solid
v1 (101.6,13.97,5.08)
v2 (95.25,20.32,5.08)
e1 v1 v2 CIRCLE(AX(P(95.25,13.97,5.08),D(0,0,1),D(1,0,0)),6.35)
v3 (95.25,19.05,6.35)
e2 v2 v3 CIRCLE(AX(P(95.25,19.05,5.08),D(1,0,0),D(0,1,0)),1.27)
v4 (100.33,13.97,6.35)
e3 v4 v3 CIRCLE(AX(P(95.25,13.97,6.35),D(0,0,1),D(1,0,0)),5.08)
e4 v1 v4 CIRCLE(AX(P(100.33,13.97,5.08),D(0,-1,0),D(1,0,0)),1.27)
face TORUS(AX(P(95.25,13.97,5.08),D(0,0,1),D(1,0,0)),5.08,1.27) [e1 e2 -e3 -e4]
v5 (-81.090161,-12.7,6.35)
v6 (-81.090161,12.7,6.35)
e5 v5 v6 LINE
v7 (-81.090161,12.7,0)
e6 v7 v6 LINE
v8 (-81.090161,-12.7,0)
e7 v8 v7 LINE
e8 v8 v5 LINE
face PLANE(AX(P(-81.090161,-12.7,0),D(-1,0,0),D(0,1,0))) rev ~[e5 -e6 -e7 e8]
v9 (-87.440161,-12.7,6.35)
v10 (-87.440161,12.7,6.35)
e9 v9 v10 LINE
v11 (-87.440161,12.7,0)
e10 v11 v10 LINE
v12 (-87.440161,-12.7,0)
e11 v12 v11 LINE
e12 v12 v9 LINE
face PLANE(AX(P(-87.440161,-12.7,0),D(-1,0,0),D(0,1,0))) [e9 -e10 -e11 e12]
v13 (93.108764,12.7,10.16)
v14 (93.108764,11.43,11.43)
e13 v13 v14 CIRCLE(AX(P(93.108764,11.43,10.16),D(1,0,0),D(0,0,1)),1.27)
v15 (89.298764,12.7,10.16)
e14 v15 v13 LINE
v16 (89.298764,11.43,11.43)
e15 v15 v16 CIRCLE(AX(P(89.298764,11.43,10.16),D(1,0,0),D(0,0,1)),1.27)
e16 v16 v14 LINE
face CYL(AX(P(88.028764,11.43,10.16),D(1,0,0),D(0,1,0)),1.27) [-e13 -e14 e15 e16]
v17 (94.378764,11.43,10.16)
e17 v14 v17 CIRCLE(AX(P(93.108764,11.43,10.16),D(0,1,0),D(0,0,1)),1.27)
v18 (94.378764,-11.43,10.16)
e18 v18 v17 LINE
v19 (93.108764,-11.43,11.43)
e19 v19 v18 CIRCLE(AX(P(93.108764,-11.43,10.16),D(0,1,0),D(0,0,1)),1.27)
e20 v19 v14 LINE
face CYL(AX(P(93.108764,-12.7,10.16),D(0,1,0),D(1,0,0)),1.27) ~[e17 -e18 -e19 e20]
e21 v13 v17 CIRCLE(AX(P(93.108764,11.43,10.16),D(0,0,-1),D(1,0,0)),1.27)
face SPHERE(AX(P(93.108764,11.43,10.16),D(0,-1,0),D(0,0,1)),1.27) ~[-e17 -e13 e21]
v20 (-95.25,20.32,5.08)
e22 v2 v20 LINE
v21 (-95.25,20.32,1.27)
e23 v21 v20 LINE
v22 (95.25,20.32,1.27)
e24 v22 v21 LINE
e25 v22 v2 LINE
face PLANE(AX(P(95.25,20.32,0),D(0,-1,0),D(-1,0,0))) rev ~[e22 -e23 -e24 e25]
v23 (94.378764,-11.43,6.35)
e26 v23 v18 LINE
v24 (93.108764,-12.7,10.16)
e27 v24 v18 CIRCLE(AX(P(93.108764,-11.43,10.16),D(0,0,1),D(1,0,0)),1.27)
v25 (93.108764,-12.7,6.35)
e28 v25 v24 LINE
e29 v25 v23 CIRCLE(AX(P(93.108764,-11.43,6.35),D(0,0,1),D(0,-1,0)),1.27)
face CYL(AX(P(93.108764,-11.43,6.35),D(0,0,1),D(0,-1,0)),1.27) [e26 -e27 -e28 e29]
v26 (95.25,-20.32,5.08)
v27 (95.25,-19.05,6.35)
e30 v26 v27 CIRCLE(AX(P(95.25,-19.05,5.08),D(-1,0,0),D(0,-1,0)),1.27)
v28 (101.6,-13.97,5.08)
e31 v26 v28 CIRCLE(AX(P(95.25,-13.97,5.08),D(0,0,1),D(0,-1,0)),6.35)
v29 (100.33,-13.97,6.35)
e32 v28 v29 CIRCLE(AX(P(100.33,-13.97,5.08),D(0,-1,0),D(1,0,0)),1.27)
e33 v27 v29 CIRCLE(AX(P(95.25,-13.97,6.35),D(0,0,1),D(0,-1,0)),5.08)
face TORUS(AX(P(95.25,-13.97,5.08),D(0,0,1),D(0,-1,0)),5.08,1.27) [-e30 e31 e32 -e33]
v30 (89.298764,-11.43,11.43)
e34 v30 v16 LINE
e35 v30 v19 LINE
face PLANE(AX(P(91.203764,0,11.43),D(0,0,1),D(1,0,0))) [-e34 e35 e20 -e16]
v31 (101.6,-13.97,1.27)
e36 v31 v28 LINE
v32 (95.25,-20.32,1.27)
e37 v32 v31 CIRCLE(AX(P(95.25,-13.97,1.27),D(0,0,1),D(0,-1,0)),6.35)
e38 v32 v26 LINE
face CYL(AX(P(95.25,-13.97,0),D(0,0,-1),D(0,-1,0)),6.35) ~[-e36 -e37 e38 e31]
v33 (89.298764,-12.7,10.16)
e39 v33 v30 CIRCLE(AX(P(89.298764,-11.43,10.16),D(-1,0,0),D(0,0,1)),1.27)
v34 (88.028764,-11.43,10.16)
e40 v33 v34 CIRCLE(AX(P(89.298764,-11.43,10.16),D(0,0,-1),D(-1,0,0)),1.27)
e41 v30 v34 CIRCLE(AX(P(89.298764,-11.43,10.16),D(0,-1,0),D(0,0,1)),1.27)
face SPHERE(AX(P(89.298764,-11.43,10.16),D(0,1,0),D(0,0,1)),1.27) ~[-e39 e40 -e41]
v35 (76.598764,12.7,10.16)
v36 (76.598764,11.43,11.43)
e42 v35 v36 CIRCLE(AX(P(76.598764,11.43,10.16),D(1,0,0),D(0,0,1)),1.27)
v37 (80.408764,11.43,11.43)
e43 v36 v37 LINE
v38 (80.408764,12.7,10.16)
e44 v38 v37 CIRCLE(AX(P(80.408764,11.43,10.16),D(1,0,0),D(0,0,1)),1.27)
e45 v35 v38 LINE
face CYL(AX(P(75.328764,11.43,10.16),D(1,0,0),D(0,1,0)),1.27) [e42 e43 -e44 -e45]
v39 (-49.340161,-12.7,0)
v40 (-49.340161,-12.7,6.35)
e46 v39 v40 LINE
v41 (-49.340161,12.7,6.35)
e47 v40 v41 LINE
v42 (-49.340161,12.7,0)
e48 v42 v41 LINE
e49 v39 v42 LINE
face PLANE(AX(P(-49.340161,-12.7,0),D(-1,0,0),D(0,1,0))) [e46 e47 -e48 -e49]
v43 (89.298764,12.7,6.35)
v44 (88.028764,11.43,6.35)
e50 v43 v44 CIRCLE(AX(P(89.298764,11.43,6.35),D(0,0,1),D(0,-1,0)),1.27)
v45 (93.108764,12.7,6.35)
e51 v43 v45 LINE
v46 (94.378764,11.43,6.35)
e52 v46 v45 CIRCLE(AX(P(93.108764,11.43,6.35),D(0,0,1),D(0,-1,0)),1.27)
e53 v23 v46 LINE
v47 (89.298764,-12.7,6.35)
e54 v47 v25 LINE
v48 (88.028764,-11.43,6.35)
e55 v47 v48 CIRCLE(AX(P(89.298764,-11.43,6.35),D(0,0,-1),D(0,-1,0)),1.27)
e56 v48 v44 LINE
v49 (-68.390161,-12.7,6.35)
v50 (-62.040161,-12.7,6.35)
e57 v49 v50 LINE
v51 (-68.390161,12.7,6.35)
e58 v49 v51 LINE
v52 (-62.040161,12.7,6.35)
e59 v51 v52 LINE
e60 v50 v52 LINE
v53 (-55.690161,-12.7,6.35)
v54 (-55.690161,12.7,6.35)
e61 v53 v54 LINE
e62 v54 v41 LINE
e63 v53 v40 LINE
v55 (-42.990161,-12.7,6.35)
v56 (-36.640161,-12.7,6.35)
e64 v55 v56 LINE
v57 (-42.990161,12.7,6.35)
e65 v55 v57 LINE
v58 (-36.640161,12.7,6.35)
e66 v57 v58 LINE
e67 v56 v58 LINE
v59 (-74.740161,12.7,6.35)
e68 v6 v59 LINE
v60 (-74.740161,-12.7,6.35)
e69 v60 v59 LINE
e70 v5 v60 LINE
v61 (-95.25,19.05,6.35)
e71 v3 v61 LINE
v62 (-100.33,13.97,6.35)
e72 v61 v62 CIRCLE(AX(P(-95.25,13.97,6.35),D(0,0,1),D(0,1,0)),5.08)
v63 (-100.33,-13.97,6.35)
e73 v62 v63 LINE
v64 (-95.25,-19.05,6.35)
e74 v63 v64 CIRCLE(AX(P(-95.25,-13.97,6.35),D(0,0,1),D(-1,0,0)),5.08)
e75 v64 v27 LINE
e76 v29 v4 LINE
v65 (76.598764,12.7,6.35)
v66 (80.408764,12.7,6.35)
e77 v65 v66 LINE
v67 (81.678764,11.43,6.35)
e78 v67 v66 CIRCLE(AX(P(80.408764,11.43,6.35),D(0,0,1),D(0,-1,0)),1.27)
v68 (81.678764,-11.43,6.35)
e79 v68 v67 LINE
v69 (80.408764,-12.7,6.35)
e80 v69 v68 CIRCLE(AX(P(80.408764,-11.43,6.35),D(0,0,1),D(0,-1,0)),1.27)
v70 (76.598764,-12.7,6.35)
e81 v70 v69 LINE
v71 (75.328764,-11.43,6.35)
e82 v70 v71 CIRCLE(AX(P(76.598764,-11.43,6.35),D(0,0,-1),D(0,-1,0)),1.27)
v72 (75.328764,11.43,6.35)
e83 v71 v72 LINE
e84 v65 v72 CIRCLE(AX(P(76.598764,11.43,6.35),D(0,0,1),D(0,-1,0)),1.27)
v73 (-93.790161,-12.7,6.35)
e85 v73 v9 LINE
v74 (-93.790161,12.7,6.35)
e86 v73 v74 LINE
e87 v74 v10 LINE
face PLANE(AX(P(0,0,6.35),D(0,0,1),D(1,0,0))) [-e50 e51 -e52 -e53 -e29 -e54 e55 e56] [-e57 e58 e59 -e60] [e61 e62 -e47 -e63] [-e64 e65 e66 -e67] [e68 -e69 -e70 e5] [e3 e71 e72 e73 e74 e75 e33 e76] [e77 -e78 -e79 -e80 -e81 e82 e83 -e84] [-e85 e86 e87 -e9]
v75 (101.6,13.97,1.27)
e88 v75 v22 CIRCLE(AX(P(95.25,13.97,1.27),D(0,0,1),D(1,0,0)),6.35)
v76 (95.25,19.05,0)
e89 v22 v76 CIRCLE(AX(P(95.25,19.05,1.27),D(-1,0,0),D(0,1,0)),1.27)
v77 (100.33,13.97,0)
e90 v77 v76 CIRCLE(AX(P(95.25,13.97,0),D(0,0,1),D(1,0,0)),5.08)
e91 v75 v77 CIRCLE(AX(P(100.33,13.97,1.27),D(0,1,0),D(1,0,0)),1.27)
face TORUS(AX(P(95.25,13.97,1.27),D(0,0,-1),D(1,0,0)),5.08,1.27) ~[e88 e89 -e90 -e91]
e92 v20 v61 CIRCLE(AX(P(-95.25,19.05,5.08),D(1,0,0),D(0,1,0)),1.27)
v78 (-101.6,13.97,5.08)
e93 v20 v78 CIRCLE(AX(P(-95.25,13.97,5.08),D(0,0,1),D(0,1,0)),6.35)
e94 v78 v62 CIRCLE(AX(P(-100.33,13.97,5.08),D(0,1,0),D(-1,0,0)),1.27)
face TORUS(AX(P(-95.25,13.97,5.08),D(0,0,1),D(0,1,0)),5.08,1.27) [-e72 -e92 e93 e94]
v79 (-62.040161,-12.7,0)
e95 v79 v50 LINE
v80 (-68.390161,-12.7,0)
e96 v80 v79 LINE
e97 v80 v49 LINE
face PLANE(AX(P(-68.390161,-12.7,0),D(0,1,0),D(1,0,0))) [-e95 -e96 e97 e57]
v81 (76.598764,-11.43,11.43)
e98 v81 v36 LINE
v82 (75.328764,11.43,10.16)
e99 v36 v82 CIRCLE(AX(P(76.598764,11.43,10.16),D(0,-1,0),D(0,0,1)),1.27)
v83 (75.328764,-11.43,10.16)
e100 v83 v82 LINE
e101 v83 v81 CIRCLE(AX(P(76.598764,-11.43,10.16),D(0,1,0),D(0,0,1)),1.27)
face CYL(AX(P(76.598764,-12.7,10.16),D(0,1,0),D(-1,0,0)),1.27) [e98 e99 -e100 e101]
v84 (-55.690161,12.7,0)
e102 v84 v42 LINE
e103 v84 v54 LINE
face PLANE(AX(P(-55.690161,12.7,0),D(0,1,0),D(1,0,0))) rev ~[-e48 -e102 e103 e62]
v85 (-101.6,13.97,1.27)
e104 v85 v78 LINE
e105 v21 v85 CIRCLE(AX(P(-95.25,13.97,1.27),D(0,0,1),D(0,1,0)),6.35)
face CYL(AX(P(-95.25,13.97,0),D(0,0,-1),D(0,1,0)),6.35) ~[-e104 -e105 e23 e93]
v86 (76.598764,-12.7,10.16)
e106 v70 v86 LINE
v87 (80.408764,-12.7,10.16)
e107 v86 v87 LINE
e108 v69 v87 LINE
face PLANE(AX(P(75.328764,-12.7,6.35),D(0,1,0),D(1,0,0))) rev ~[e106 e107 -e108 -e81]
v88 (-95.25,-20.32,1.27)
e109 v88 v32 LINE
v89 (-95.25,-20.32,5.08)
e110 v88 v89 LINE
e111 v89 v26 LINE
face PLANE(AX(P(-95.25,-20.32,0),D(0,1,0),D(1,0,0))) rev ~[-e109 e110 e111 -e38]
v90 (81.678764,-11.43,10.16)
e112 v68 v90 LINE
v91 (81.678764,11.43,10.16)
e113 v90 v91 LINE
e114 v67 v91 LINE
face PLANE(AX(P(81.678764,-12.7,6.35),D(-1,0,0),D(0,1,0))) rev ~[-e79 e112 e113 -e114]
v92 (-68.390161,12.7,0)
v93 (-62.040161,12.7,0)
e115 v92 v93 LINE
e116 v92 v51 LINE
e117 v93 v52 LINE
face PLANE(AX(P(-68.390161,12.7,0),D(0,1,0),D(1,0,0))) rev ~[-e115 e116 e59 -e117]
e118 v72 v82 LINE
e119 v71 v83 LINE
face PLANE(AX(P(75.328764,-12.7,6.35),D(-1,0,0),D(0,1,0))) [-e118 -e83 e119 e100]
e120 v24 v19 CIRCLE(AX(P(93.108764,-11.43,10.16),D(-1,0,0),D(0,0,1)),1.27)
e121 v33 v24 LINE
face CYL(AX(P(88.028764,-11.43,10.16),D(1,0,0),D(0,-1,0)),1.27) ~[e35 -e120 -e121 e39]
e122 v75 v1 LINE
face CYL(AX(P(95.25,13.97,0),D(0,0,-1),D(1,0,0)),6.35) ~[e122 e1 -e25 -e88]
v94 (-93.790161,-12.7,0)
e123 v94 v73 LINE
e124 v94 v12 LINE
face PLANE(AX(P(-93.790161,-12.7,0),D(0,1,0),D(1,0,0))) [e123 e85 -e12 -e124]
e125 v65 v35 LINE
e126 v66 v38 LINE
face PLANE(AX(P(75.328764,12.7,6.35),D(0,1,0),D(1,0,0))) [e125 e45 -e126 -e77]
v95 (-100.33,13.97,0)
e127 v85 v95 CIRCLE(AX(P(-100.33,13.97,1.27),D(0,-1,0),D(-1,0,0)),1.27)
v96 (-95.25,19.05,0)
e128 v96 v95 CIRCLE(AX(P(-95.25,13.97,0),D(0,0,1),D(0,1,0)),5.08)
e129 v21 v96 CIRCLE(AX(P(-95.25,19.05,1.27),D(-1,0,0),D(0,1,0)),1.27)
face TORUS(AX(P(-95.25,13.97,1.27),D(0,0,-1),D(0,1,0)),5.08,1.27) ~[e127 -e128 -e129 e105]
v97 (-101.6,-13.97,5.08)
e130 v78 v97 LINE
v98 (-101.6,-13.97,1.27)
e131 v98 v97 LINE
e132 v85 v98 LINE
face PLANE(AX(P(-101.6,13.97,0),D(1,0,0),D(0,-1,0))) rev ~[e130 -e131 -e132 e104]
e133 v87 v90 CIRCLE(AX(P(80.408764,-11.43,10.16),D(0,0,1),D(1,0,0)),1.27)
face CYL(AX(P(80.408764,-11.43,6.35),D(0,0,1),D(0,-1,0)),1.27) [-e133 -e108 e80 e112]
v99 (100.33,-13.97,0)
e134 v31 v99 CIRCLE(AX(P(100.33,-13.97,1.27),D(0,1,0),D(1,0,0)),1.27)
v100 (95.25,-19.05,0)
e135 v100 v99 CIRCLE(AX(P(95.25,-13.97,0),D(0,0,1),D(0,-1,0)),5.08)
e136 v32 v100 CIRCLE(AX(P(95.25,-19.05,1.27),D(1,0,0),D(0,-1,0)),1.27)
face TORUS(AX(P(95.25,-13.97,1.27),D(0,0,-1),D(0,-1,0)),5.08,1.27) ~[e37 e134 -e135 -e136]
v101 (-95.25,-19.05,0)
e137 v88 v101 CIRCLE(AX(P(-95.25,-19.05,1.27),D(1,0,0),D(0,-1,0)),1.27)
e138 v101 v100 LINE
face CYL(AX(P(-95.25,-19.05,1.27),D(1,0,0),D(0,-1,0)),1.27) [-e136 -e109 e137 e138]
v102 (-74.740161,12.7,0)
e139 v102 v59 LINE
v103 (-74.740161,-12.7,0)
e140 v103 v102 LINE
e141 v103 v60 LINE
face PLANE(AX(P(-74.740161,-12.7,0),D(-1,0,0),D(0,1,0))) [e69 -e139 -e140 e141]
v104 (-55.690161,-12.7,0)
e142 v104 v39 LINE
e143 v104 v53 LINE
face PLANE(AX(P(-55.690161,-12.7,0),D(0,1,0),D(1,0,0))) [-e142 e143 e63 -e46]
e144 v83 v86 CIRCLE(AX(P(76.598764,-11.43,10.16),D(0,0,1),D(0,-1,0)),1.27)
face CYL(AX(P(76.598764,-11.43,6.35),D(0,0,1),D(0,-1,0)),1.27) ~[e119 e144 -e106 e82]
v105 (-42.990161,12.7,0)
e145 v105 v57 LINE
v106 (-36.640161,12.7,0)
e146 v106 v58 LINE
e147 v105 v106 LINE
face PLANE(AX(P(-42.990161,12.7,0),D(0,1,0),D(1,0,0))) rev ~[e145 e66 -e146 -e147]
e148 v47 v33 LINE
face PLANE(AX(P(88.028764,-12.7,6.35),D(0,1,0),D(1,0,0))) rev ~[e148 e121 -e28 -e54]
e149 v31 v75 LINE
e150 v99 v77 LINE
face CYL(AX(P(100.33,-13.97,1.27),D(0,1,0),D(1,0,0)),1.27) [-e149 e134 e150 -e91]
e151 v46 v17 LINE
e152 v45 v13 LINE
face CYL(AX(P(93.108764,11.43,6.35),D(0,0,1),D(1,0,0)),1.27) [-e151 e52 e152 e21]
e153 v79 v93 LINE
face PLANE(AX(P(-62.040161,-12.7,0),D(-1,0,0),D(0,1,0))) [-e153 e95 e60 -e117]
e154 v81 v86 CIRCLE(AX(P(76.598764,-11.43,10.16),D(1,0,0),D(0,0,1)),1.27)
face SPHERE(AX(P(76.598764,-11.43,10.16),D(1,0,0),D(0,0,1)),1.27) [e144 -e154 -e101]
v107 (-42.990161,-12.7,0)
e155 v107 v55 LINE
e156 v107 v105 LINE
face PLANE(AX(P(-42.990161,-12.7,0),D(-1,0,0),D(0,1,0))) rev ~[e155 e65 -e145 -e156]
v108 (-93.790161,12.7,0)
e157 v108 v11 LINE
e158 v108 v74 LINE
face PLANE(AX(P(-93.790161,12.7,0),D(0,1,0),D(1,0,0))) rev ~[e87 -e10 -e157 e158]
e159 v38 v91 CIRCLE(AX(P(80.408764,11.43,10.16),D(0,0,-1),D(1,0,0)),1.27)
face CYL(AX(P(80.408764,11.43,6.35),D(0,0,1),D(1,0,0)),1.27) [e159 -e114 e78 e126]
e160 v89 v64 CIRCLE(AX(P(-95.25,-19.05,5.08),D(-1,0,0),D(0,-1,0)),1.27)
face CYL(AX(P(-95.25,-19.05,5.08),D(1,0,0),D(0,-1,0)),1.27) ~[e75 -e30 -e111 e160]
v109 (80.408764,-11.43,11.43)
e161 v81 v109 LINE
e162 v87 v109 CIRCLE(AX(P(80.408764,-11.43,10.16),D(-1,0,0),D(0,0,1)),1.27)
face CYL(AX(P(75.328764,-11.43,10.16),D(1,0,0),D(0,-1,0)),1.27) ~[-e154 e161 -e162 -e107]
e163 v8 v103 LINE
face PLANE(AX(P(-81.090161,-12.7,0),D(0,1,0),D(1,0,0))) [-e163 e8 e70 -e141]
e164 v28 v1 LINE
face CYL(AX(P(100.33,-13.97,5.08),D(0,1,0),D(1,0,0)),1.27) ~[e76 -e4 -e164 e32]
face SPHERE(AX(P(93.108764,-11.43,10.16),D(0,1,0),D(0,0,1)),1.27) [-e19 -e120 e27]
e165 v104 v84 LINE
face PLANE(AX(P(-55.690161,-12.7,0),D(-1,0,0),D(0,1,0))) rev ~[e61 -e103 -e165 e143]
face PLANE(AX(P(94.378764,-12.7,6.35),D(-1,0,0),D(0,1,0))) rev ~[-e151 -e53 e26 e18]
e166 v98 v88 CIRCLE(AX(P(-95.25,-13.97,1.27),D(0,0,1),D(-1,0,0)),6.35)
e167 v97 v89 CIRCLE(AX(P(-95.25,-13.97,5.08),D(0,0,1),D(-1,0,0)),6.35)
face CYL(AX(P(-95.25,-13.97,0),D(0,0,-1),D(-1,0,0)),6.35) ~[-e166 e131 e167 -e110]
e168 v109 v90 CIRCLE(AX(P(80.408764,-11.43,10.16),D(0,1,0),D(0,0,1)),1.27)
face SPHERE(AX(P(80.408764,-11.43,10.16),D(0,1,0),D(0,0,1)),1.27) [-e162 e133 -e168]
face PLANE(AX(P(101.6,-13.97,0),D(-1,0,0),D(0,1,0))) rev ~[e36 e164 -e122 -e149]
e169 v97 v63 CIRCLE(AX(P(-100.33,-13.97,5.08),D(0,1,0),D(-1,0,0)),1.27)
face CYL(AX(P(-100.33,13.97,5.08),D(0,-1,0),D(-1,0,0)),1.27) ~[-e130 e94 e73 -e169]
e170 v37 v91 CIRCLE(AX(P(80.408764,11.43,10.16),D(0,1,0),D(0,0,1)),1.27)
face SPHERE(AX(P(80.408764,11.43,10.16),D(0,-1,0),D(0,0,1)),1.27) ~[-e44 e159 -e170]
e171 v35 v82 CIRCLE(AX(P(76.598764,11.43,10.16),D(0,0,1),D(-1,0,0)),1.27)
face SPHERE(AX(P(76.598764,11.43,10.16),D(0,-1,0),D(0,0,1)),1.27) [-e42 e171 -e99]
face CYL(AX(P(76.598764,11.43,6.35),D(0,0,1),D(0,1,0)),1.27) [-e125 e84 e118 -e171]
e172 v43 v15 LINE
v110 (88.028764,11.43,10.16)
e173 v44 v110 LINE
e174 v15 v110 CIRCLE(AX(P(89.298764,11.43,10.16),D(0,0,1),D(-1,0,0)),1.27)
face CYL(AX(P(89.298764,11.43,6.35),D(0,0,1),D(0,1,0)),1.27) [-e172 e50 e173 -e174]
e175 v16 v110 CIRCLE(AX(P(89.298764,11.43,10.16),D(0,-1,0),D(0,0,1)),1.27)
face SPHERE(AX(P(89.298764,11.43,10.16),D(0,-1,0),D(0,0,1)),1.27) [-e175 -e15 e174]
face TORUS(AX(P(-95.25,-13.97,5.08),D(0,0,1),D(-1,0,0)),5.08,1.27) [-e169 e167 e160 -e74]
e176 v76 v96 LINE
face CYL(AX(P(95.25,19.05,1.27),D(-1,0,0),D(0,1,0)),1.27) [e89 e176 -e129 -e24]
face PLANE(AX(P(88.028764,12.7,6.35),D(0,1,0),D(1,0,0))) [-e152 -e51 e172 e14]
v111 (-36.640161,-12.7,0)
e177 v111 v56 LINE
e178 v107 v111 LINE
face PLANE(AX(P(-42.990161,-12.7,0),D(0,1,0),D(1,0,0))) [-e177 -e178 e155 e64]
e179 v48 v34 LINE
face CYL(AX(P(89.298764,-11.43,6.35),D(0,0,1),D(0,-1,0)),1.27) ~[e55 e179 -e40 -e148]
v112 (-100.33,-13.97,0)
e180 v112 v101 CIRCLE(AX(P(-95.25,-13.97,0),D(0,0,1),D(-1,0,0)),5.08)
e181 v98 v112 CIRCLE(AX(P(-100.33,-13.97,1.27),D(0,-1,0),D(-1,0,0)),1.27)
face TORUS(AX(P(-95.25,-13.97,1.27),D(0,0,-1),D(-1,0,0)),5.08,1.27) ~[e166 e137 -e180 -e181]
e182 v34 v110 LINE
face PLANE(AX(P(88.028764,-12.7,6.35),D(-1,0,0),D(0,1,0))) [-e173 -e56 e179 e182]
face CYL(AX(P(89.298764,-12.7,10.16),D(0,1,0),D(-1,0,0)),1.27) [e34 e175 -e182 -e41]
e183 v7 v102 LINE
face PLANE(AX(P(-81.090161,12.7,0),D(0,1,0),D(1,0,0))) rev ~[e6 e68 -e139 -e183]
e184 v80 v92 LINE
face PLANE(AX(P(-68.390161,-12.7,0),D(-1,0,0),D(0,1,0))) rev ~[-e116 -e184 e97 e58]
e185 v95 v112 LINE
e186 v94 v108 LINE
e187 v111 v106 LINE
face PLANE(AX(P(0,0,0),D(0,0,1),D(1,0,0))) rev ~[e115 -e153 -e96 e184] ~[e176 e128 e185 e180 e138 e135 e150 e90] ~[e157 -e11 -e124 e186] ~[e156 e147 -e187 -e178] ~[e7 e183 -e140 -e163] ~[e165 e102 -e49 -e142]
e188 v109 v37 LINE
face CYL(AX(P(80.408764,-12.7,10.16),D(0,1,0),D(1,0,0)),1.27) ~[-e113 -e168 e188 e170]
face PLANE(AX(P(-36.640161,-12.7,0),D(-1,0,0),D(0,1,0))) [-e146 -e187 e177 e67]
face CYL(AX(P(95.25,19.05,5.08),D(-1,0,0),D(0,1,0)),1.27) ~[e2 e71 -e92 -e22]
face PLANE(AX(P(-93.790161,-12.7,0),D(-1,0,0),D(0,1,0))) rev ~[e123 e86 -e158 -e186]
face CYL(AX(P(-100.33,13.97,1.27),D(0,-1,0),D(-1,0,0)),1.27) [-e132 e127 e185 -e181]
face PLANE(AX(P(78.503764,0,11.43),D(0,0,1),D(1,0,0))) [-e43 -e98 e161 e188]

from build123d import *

# Parameters (mm, degrees)
F0_W     = 6.35
F0_H     = 25.4
F0_R     = 17.5576306553
F1_DEPTH = 6.35
F2_R     = 1.27
F3_W     = 6.35
F3_H     = 25.4
F4_DEPTH = 5.08
F5_R     = 1.27


# Not quite as in the source:
# - a feature names something its author has since deleted; it is built from what else it names


with BuildPart() as f1:
    # F0 (on Top) → F1 (new body)
    with BuildSketch(Plane.XY):
        with BuildLine():
            ThreePointArc((101.6, 13.97), (99.7401280605, 18.4601280605), (95.25, 20.32))
            Line((95.25, 20.32), (-95.25, 20.32))
            ThreePointArc((-95.25, 20.32), (-99.7401280605, 18.4601280605), (-101.6, 13.97))
            Line((-101.6, 13.97), (-101.6, -13.97))
            ThreePointArc((-101.6, -13.97), (-99.7401280605, -18.4601280605), (-95.25, -20.32))
            Line((-95.25, -20.32), (95.25, -20.32))
            ThreePointArc((95.25, -20.32), (99.7401280605, -18.4601280605), (101.6, -13.97))
            Line((101.6, -13.97), (101.6, 13.97))
        make_face()
        with Locations((-90.6151607633, 0)):
            Rectangle(F0_W, F0_H, mode=Mode.SUBTRACT)
        with Locations((-77.9151607633, 0)):
            Rectangle(F0_W, F0_H, mode=Mode.SUBTRACT)
        with Locations((-65.2151607633, 0)):
            Rectangle(F0_W, F0_H, mode=Mode.SUBTRACT)
        with Locations((-52.5151607633, 0)):
            Rectangle(F0_W, F0_H, mode=Mode.SUBTRACT)
        with Locations((-39.8151607633, 0)):
            Rectangle(F0_W, F0_H, mode=Mode.SUBTRACT)
        with Locations((4.1378471069, 0)):
            Circle(F0_R, mode=Mode.SUBTRACT)
        with Locations((4.1378471069, 0)):
            Circle(F0_R)
    extrude(amount=F1_DEPTH)

    # F2
    f2_edges = [f1.edges().sort_by_distance(p)[0] for p in [
        (0, -20.32, 0),
        (0, -20.32, 6.35),
    ]]
    fillet(f2_edges, radius=F2_R)

    # F3 (on face) → F4 (join)
    with BuildSketch(Plane.XY.offset(6.35)):
        with Locations((78.503764081, 0)):
            Rectangle(F3_W, F3_H)
        with Locations((91.203764081, 0)):
            Rectangle(F3_W, F3_H)
    extrude(amount=F4_DEPTH)

    # F5
    f5_edges = [f1.edges().sort_by_distance(p)[0] for p in [
        (81.678764, 0, 11.43),
        (78.503764, -12.7, 11.43),
        (75.328764, 0, 11.43),
        (78.503764, 12.7, 11.43),
        (88.028764, 0, 11.43),
        (94.378764, 0, 11.43),
        (91.203764, -12.7, 11.43),
        (91.203764, 12.7, 11.43),
        (94.378764, -12.7, 8.89),
        (88.028764, -12.7, 8.89),
        (81.678764, -12.7, 8.89),
        (75.328764, -12.7, 8.89),
        (81.678764, 12.7, 8.89),
        (94.378764, 12.7, 8.89),
        (88.028764, 12.7, 8.89),
        (75.328764, 12.7, 8.89),
    ]]
    fillet(f5_edges, radius=F5_R)


solid = f1.part
